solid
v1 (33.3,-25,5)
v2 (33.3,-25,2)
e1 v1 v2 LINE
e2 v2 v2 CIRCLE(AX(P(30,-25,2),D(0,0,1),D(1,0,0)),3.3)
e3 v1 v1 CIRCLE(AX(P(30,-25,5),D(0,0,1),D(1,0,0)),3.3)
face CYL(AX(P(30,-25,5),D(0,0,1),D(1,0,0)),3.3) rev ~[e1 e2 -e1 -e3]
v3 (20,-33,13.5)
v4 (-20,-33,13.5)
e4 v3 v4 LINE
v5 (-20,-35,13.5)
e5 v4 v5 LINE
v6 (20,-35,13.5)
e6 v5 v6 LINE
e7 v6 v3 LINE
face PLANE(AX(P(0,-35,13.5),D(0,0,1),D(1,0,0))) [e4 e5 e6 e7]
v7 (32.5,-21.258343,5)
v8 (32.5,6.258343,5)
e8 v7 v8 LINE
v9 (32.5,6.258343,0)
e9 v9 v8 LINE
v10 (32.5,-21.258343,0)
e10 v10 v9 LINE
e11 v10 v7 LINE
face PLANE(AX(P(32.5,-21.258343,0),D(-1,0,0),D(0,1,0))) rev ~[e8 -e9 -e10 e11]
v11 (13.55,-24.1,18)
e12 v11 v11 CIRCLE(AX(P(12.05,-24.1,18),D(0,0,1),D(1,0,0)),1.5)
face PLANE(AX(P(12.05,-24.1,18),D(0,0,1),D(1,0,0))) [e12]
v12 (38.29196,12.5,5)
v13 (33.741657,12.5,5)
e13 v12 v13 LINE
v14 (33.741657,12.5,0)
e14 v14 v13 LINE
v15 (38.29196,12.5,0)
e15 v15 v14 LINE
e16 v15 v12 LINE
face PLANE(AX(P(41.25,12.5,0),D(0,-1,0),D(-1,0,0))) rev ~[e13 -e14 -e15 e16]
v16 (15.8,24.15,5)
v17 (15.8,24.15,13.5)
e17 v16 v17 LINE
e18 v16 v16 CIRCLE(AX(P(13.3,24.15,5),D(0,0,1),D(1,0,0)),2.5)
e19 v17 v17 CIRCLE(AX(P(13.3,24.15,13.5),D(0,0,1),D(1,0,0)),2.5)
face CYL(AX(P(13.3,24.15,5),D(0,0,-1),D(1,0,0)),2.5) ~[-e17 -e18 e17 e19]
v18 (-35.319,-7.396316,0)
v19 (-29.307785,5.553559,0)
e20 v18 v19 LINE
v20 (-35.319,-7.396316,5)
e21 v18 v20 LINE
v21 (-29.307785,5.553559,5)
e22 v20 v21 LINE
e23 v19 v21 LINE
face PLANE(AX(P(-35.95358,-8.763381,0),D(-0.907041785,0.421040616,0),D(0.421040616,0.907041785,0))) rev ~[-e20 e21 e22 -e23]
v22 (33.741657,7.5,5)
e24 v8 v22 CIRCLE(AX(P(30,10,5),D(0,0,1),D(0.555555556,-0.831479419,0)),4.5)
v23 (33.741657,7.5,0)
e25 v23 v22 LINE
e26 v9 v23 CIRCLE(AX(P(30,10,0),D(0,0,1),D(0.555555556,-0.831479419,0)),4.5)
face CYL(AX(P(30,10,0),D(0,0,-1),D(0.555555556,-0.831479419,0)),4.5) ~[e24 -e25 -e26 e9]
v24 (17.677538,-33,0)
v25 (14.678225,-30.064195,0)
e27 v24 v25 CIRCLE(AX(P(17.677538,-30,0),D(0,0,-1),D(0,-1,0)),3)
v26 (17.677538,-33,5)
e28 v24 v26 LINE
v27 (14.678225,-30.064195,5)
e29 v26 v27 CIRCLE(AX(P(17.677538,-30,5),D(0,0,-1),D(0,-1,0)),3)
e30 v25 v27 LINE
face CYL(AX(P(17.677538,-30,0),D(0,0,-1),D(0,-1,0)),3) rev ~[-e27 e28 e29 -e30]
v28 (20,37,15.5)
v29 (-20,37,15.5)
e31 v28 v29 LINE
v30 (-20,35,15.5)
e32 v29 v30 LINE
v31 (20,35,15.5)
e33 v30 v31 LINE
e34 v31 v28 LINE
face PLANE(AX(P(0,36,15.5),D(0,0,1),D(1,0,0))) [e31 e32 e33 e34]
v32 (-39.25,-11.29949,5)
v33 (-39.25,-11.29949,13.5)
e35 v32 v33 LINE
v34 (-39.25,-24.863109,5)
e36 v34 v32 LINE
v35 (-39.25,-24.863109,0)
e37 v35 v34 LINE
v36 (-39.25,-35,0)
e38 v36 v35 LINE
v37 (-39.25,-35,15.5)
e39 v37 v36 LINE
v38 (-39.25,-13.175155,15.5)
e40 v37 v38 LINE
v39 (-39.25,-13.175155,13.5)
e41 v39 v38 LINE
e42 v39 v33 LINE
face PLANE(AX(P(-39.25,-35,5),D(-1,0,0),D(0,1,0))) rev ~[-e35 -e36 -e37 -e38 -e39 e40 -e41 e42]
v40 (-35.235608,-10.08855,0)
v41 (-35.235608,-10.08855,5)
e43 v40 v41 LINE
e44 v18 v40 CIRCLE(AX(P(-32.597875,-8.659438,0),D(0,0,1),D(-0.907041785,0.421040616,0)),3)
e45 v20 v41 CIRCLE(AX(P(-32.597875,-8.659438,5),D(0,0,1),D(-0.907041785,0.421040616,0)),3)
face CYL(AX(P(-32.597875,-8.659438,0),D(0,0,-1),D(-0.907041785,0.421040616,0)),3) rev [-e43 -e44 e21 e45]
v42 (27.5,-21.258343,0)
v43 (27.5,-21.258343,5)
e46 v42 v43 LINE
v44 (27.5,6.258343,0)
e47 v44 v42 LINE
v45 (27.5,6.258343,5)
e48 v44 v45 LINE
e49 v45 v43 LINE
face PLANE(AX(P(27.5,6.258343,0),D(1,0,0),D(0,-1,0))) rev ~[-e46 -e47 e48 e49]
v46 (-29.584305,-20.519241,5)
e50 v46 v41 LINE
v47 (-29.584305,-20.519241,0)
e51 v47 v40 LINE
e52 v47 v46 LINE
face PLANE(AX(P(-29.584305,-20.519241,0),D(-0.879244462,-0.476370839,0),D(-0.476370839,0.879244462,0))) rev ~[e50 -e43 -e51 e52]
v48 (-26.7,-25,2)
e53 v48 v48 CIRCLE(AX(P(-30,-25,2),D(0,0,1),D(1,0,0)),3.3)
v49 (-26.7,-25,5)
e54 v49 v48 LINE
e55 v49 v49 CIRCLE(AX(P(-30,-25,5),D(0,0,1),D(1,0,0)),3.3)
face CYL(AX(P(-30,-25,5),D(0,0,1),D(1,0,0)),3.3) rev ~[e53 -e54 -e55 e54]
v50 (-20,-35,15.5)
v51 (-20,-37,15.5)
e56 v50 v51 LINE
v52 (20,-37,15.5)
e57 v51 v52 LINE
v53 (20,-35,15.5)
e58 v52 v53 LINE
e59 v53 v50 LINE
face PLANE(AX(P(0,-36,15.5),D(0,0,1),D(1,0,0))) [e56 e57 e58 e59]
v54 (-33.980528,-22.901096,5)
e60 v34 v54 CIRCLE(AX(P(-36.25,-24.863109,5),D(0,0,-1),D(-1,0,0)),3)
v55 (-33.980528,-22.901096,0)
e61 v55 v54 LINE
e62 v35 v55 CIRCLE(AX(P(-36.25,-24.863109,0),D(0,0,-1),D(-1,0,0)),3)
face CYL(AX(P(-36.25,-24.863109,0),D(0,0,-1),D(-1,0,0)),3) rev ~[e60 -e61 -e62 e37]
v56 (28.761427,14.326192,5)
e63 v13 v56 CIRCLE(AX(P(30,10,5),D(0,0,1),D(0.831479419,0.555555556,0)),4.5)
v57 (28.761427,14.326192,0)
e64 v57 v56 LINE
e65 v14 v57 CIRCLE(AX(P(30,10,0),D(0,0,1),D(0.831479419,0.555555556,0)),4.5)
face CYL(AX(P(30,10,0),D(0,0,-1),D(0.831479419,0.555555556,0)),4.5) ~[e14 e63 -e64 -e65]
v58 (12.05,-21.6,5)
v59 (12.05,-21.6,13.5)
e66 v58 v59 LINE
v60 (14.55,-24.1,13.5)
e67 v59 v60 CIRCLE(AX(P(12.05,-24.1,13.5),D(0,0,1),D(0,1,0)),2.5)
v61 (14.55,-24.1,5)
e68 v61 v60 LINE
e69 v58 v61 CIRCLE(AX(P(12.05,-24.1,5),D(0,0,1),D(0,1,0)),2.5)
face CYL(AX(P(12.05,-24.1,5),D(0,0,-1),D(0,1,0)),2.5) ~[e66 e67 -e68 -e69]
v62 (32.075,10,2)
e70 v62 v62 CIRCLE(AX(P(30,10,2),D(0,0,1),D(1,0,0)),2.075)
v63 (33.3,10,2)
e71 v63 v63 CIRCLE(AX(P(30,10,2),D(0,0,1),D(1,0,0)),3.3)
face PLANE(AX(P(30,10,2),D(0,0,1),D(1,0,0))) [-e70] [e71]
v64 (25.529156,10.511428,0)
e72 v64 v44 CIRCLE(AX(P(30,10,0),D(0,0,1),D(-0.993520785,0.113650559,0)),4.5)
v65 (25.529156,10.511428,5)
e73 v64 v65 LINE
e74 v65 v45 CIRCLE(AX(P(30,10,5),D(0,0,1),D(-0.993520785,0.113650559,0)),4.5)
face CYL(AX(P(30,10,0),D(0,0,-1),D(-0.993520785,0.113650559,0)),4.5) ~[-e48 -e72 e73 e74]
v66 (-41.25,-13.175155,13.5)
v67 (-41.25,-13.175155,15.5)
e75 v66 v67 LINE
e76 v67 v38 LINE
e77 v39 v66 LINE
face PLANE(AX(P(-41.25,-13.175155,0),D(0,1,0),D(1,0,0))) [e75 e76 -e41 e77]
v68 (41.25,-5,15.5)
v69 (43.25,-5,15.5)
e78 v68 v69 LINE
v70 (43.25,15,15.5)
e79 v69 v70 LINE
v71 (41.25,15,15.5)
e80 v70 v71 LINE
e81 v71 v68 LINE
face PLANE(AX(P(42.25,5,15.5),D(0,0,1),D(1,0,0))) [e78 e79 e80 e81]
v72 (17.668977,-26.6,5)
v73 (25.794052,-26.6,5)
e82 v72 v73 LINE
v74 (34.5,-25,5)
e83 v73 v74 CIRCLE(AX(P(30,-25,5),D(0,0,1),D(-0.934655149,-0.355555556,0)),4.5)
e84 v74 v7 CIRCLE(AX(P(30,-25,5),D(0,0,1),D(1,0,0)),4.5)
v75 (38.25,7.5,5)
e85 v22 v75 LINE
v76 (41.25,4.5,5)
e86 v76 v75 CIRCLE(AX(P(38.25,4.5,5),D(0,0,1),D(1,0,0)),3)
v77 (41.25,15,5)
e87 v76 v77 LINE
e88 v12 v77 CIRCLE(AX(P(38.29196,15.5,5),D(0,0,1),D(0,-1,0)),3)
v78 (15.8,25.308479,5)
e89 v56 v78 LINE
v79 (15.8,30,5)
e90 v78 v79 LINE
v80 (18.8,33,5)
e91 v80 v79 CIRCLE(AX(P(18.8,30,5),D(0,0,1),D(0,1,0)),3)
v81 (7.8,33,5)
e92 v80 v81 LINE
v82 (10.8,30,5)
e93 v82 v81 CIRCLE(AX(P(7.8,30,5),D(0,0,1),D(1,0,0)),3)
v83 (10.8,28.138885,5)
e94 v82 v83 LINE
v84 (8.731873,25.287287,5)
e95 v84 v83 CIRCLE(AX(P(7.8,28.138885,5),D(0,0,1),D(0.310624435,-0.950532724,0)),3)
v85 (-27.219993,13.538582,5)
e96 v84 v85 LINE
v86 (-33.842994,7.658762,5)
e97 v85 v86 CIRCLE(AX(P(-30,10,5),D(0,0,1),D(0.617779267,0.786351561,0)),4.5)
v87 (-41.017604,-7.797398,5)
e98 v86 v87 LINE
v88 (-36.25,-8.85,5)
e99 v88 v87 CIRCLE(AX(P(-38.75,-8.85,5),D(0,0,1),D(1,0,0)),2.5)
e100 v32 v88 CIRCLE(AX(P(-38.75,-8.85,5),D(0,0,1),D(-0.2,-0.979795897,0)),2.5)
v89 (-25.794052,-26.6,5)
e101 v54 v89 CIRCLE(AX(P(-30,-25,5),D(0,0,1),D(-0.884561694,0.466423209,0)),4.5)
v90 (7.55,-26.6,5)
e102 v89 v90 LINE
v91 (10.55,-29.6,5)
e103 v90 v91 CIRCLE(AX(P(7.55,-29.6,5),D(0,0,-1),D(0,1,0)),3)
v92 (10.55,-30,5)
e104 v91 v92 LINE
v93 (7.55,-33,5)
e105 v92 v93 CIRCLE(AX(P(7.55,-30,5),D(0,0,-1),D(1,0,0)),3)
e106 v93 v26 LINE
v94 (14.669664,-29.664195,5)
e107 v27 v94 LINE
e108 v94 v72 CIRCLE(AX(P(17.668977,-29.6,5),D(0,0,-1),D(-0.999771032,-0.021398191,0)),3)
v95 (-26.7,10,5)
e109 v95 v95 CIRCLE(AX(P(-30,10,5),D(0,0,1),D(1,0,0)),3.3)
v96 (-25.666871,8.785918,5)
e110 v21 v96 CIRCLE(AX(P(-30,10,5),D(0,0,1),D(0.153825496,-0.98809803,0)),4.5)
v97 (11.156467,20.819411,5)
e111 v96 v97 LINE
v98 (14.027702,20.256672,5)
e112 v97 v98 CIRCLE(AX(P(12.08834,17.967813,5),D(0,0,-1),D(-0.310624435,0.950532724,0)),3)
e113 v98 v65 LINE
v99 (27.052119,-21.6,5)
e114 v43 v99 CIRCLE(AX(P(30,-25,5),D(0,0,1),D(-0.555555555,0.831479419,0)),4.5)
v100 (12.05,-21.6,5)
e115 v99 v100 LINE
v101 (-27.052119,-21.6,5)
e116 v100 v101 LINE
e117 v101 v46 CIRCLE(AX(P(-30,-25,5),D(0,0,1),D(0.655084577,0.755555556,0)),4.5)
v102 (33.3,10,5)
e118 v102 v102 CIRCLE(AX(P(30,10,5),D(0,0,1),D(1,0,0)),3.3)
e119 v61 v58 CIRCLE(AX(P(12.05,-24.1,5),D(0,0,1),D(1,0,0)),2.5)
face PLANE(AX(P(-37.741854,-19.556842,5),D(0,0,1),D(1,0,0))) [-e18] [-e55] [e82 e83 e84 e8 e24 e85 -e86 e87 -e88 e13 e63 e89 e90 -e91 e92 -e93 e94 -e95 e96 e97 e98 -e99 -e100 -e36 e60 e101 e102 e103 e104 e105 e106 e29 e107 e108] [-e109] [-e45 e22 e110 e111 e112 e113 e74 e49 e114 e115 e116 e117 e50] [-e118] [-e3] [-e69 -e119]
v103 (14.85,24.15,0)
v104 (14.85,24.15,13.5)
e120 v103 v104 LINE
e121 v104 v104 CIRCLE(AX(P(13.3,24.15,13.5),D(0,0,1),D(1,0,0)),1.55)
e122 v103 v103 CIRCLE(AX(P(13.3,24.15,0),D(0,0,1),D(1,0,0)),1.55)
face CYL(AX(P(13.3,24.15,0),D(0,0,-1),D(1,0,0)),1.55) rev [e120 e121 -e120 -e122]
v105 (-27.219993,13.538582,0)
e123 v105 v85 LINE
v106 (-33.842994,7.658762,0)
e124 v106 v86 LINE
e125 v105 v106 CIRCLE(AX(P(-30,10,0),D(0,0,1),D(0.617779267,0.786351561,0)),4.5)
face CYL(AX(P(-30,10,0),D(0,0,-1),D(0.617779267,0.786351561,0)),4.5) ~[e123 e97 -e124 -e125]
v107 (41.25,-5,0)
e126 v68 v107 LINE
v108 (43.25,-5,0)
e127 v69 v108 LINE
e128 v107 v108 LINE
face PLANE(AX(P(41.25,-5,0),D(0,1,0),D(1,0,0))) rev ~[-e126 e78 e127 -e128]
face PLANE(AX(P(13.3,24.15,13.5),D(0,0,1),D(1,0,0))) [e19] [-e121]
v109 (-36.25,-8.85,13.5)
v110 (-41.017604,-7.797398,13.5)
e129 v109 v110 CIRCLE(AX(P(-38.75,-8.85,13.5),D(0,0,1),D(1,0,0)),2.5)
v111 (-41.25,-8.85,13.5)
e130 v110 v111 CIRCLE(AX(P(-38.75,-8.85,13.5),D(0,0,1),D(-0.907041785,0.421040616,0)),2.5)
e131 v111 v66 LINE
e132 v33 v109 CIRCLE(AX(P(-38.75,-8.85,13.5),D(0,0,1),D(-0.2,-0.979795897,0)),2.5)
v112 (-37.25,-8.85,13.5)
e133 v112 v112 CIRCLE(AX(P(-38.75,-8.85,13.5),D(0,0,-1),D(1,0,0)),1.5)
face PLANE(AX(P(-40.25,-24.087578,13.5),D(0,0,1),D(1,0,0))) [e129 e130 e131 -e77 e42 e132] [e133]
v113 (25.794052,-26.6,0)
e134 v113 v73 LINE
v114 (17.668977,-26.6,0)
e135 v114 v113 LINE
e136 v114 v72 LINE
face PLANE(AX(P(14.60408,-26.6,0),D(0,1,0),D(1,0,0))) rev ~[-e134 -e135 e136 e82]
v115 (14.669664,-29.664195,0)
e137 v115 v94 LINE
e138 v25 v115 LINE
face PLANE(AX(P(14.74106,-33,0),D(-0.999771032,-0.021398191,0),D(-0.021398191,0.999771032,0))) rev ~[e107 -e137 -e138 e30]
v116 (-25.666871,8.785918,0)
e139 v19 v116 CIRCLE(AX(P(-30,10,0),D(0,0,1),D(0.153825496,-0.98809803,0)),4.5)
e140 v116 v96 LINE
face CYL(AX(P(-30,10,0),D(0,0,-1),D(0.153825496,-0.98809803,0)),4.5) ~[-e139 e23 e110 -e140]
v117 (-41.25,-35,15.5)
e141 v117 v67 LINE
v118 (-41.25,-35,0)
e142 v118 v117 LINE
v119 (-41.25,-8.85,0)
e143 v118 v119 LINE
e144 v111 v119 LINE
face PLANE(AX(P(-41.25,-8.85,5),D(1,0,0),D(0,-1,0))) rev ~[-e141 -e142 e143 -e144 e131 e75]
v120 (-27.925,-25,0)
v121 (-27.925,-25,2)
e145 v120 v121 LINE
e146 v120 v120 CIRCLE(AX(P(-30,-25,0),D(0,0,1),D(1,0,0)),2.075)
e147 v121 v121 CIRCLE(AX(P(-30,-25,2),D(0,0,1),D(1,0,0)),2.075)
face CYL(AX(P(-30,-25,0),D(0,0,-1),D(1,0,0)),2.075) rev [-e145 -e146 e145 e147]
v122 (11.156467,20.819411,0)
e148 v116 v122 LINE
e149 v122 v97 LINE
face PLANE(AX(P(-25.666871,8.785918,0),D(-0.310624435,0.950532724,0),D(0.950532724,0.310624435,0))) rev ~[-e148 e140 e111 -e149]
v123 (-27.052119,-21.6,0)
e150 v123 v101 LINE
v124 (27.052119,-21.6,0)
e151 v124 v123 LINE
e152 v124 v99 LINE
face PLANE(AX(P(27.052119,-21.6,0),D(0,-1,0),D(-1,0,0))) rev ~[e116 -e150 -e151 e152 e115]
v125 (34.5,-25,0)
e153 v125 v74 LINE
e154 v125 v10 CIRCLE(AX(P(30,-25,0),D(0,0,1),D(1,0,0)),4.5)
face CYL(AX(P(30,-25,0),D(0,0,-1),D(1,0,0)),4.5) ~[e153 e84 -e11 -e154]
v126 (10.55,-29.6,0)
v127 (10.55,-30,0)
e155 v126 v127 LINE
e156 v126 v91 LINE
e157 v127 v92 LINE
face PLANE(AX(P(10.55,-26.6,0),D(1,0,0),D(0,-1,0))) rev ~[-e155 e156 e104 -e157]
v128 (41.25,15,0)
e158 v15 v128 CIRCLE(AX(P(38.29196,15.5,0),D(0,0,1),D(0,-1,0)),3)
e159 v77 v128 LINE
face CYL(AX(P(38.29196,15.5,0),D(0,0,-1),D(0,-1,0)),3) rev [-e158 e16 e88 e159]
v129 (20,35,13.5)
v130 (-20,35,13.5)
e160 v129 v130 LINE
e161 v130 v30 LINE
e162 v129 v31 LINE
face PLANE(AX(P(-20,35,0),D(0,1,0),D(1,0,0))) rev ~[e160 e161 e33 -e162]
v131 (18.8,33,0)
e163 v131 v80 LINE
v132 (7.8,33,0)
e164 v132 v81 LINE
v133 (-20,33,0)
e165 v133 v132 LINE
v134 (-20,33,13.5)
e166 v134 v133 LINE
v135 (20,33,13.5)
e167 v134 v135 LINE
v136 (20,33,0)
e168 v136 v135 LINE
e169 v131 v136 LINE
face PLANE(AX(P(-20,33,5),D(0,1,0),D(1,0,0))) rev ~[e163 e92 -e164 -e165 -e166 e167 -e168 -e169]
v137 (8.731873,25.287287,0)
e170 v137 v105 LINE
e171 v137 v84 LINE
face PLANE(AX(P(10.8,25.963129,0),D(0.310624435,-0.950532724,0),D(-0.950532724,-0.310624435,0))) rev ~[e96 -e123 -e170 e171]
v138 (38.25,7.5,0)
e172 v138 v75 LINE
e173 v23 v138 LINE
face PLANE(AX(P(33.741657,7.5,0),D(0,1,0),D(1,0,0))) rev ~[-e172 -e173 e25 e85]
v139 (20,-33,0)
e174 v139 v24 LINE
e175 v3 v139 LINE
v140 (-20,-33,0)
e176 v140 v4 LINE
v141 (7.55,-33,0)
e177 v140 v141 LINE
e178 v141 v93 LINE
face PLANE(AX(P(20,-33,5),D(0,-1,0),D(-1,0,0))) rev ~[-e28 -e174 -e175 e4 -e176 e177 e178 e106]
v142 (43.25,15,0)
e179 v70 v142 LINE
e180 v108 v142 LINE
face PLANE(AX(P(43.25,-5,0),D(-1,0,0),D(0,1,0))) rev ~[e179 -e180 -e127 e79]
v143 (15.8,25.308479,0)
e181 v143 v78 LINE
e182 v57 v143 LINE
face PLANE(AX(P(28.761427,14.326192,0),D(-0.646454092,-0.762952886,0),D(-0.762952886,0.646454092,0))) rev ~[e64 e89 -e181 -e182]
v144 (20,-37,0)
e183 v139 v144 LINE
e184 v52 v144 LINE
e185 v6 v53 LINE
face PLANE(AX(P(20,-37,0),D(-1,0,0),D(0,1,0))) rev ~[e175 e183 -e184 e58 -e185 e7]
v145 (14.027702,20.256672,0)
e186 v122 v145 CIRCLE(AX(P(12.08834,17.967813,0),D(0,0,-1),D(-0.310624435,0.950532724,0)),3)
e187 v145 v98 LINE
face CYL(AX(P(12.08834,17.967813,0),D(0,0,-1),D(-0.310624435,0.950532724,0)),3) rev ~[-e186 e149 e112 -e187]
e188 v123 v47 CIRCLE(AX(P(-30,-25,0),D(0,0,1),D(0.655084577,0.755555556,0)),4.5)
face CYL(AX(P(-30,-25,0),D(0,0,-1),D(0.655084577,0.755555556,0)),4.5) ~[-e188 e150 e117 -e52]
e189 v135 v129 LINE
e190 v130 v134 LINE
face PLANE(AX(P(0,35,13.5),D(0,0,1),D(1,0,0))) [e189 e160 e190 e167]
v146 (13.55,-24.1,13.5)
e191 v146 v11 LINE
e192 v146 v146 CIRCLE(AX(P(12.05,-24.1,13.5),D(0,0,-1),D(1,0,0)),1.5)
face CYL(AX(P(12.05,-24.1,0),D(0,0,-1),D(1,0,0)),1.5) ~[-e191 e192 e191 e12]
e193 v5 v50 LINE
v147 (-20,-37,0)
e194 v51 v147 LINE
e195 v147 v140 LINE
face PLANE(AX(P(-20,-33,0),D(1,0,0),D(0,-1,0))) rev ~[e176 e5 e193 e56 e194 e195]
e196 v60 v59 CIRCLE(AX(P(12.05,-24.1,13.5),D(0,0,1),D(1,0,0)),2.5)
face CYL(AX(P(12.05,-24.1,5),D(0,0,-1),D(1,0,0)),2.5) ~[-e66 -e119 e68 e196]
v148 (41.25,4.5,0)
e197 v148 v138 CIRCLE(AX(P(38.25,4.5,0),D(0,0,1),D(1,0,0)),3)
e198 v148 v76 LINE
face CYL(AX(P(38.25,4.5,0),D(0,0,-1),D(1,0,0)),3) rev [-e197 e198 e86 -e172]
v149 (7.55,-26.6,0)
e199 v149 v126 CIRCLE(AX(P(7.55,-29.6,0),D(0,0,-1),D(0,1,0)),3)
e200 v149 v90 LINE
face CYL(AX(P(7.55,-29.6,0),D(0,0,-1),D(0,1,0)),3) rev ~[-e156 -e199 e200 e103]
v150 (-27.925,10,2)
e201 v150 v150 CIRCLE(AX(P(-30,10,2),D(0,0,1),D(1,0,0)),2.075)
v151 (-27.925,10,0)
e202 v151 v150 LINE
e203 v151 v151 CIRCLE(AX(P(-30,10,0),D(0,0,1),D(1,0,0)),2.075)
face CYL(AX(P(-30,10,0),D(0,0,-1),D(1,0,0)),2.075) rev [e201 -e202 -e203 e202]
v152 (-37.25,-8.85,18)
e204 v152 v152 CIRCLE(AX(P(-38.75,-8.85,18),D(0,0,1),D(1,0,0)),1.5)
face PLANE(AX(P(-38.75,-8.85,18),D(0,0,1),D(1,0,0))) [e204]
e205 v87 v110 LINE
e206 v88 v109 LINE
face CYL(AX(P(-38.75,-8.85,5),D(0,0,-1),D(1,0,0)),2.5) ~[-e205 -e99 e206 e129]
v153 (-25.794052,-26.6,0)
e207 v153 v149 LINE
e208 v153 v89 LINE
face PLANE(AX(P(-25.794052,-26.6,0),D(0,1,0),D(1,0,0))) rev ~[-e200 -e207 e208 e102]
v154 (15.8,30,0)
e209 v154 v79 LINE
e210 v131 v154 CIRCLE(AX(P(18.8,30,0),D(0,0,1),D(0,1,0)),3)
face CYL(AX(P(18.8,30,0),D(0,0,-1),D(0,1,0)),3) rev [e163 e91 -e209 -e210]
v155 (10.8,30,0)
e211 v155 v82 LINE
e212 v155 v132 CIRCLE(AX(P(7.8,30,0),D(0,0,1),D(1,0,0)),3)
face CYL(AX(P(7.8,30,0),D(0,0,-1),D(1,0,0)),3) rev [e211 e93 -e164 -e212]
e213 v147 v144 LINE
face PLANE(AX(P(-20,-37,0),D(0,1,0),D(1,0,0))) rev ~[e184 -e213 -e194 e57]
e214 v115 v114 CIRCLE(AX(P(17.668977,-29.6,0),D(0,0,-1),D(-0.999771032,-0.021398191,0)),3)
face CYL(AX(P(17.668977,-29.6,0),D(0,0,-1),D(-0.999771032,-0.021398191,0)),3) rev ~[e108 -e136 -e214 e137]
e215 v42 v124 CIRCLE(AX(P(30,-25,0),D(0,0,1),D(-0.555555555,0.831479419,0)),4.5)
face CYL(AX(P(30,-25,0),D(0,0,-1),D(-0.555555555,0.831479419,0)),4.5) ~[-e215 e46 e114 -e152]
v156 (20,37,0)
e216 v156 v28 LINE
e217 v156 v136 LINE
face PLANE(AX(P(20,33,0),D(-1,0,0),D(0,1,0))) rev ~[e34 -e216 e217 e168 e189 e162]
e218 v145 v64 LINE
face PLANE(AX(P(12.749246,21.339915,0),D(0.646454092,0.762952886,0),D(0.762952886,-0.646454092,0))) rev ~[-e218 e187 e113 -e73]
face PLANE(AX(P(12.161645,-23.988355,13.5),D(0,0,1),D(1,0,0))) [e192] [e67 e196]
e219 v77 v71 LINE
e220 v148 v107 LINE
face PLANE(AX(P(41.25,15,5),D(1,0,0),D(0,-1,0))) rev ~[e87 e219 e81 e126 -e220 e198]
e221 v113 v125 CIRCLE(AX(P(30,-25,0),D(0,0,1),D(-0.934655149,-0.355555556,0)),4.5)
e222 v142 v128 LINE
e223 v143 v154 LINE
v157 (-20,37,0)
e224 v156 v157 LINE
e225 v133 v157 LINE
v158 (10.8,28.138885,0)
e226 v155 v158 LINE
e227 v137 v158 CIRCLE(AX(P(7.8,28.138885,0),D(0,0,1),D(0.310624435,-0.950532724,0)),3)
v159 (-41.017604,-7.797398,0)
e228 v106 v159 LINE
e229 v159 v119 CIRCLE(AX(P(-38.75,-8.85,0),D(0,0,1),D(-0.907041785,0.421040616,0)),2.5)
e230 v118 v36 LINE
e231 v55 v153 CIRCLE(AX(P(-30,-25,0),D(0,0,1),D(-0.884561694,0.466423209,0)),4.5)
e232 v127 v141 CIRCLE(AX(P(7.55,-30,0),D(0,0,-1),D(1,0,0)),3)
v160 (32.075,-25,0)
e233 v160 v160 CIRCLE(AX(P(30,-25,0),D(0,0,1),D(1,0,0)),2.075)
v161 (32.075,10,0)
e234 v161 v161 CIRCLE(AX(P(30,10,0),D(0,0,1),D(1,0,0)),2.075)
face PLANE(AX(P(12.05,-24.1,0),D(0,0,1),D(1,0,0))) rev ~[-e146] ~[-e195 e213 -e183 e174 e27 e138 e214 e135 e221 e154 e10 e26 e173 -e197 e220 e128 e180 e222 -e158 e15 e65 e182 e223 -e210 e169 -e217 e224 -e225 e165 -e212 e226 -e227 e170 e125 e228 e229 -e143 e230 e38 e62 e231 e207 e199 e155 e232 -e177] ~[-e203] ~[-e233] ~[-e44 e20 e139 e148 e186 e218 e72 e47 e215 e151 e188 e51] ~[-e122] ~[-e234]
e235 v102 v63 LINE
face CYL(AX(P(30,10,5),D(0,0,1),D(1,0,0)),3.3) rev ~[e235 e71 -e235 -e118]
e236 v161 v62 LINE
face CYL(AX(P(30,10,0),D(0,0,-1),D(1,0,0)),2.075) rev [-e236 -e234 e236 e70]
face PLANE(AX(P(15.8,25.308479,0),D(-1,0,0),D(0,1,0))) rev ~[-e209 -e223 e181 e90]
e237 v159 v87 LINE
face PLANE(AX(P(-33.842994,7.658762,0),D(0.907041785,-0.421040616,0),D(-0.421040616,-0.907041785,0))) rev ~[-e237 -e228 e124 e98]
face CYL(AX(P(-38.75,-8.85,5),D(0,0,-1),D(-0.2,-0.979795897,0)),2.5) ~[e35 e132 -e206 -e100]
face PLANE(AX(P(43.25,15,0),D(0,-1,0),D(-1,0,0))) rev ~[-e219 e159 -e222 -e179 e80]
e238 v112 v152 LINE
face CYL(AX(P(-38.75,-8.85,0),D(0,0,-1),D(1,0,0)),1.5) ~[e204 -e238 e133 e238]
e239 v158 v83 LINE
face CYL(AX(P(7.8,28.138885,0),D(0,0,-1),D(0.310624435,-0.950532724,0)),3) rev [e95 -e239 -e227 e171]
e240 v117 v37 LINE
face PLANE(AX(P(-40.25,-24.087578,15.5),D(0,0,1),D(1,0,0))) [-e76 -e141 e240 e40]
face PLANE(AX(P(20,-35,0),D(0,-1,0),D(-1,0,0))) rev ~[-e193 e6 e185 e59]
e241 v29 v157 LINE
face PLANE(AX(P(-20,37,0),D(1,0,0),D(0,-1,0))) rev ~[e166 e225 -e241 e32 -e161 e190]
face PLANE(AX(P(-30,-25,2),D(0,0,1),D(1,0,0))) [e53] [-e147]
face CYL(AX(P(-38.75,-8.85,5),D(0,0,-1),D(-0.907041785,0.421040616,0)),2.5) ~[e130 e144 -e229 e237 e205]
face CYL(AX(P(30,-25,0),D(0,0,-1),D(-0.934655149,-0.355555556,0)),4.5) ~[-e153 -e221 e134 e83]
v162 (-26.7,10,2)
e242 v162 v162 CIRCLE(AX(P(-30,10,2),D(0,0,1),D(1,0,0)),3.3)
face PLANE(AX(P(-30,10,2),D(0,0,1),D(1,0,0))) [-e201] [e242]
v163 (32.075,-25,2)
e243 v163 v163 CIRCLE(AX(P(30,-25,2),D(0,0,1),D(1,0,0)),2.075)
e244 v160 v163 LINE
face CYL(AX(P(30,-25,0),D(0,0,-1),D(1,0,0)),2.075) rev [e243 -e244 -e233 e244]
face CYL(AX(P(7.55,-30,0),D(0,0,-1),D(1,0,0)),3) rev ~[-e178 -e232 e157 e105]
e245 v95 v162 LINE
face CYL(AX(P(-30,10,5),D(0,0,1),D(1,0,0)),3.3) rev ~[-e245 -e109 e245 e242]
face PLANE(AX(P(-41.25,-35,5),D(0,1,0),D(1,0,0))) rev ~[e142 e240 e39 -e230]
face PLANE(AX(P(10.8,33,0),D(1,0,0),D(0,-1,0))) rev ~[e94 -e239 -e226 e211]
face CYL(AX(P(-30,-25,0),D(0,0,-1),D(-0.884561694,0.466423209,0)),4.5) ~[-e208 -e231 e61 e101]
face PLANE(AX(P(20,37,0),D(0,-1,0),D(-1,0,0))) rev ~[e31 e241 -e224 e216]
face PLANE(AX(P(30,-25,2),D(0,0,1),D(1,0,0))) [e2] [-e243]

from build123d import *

# Parameters (mm, degrees)
F0_R        = 2.075
F0_R_2      = 1.5
F0_W        = 2
F0_H        = 21.8248448855
F0_R_3      = 1.55
F0_W_2      = 30.8
F0_H_2      = 2
F0_W_3      = 4.2
F0_W_4      = 5
F0_W_5      = 30.55
F1_DEPTH    = 5
F2_W        = 2
F2_H        = 21.8248448855
F2_R        = 2.5
F3_DEPTH    = 8.5
F4_DEPTH    = 11
F5_DEPTH    = 13.5
F6_T1_DEPTH = 5
F7_R        = 3.3
F7_R_2      = 2.075
F8_DEPTH    = 3
F9_DEPTH    = 18
F10_DEPTH   = 15.5


# Not quite as in the source:
# - a fillet or chamfer that OpenCascade refuses, or shapes differently, is made with other operations: its cross-section is extruded or revolved along the edge and cut away or added


with BuildPart() as f1:
    # F0 (on Top) → F1 (new body)
    with BuildSketch(Plane.XY):
        with BuildLine():
            Line((10.8, 24.15), (10.8, 25.9631294877))
            Line((10.8, 25.9631294877), (-27.2199932987, 13.538582024))
            ThreePointArc((-27.2199932987, 13.538582024), (-25.9527768683, 11.967227725), (-25.5, 10))
            ThreePointArc((-25.5, 10), (-25.5419129691, 9.387252071), (-25.666871122, 8.785918402))
            Line((-25.666871122, 8.785918402), (12.7492455063, 21.3399149445))
            Line((12.7492455063, 21.3399149445), (11.6838647694, 22.2426177844))
            ThreePointArc((11.6838647694, 22.2426177844), (11.0317034942, 23.0988906043), (10.8, 24.15))
        make_face()
        with BuildLine():
            ThreePointArc((-27.2199932987, 13.538582024), (-32.9875670099, 13.3651810295), (-33.8429941942, 7.6587619464))
            ThreePointArc((-33.8429941942, 7.6587619464), (-31.8946827733, 5.9183119683), (-29.30778527, 5.5535588649))
            ThreePointArc((-29.30778527, 5.5535588649), (-27.0124329901, 6.6348189705), (-25.666871122, 8.785918402))
            ThreePointArc((-25.666871122, 8.785918402), (-25.5419129691, 9.387252071), (-25.5, 10))
            ThreePointArc((-25.5, 10), (-25.9527768683, 11.967227725), (-27.2199932987, 13.538582024))
        make_face()
        with Locations((-30, 10)):
            Circle(F0_R, mode=Mode.SUBTRACT)
        with BuildLine():
            Line((-33.8429941942, 7.6587619464), (-41.0176044621, -7.7973984593))
            ThreePointArc((-41.0176044621, -7.7973984593), (-38.8274003861, -6.3511984512), (-36.5518888448, -7.6590729035))
            Line((-36.5518888448, -7.6590729035), (-35.9535795759, -8.7633808683))
            Line((-35.9535795759, -8.7633808683), (-29.30778527, 5.5535588649))
            ThreePointArc((-29.30778527, 5.5535588649), (-31.8946827733, 5.9183119683), (-33.8429941942, 7.6587619464))
        make_face()
        with BuildLine():
            ThreePointArc((-41.0176044621, -7.7973984593), (-41.1912098594, -8.3110246551), (-41.25, -8.85))
            ThreePointArc((-41.25, -8.85), (-41.1733528311, -9.4642972049), (-40.9481111552, -10.0409270965))
            ThreePointArc((-40.9481111552, -10.0409270965), (-38.6725996139, -11.3488015488), (-36.4823955379, -9.9026015407))
            ThreePointArc((-36.4823955379, -9.9026015407), (-36.3087901406, -9.3889753449), (-36.25, -8.85))
            ThreePointArc((-36.25, -8.85), (-36.3266471689, -8.2357027951), (-36.5518888448, -7.6590729035))
            ThreePointArc((-36.5518888448, -7.6590729035), (-38.8274003861, -6.3511984512), (-41.0176044621, -7.7973984593))
        make_face()
        with Locations((-38.75, -8.85)):
            Circle(F0_R_2, mode=Mode.SUBTRACT)
        with BuildLine():
            ThreePointArc((-40.9481111552, -10.0409270965), (-41.1733528311, -9.4642972049), (-41.25, -8.85))
            Line((-41.25, -8.85), (-41.25, -13.1751551145))
            Line((-41.25, -13.1751551145), (-39.25, -13.1751551145))
            Line((-39.25, -13.1751551145), (-40.9481111552, -10.0409270965))
        make_face()
        with BuildLine():
            Line((-35.9535795759, -8.7633808683), (-36.5518888448, -7.6590729035))
            ThreePointArc((-36.5518888448, -7.6590729035), (-36.3266471689, -8.2357027951), (-36.25, -8.85))
            ThreePointArc((-36.25, -8.85), (-36.3087901406, -9.3889753449), (-36.4823955379, -9.9026015407))
            Line((-36.4823955379, -9.9026015407), (-35.9535795759, -8.7633808683))
        make_face()
        with BuildLine():
            ThreePointArc((-36.4823955379, -9.9026015407), (-38.6725996139, -11.3488015488), (-40.9481111552, -10.0409270965))
            Line((-40.9481111552, -10.0409270965), (-39.25, -13.1751551145))
            Line((-39.25, -13.1751551145), (-33.9805276223, -22.9010955601))
            ThreePointArc((-33.9805276223, -22.9010955601), (-32.1436687737, -21.0433999206), (-29.5843053118, -20.5192413671))
            Line((-29.5843053118, -20.5192413671), (-35.9535795759, -8.7633808683))
            Line((-35.9535795759, -8.7633808683), (-36.4823955379, -9.9026015407))
        make_face()
        with Locations((-40.25, -24.0875775572)):
            Rectangle(F0_W, F0_H)
        with BuildLine():
            ThreePointArc((-29.5843053118, -20.5192413671), (-32.1436687737, -21.0433999206), (-33.9805276223, -22.9010955601))
            ThreePointArc((-33.9805276223, -22.9010955601), (-31.8528834609, -29.1008319742), (-25.794051831, -26.6))
            ThreePointArc((-25.794051831, -26.6), (-25.5741234337, -25.8133981927), (-25.5, -25))
            ThreePointArc((-25.5, -25), (-25.9063791898, -23.1312387359), (-27.0521194054, -21.6))
            ThreePointArc((-27.0521194054, -21.6), (-28.2335290899, -20.8612102586), (-29.5843053118, -20.5192413671))
        make_face()
        with Locations((-30, -25)):
            Circle(F0_R, mode=Mode.SUBTRACT)
        with BuildLine():
            ThreePointArc((-25.5, -25), (-25.5741234337, -25.8133981927), (-25.794051831, -26.6))
            Line((-25.794051831, -26.6), (10.55, -26.6))
            Line((10.55, -26.6), (10.55, -26.1))
            ThreePointArc((10.55, -26.1), (9.6782917549, -23.309430585), (12.05, -21.6))
            Line((12.05, -21.6), (-27.0521194054, -21.6))
            ThreePointArc((-27.0521194054, -21.6), (-25.9063791898, -23.1312387359), (-25.5, -25))
        make_face()
        with BuildLine():
            Line((10.55, -26.1), (10.55, -26.6))
            Line((10.55, -26.6), (12.05, -26.6))
            ThreePointArc((12.05, -26.6), (11.259430585, -26.4717082451), (10.55, -26.1))
        make_face()
        with BuildLine():
            ThreePointArc((14.5494275812, -24.0465045226), (13.7987511696, -22.3134196501), (12.05, -21.6))
            ThreePointArc((12.05, -21.6), (9.6782917549, -23.309430585), (10.55, -26.1))
            ThreePointArc((10.55, -26.1), (11.259430585, -26.4717082451), (12.05, -26.6))
            ThreePointArc((12.05, -26.6), (13.817766953, -25.867766953), (14.55, -24.1))
            ThreePointArc((14.55, -24.1), (14.5498568912, -24.0732507301), (14.5494275812, -24.0465045226))
        make_face()
        with Locations((12.05, -24.1)):
            Circle(F0_R_2, mode=Mode.SUBTRACT)
        with Locations((12.05, -24.1)):
            Circle(F0_R_2)
        Polygon((12.05, -26.6), (10.55, -26.6), (10.55, -33), (14.7410600647, -33), (14.6040802787, -26.6), align=None)
        with BuildLine():
            ThreePointArc((14.55, -24.1), (13.817766953, -25.867766953), (12.05, -26.6))
            Line((12.05, -26.6), (14.6040802787, -26.6))
            Line((14.6040802787, -26.6), (14.5494275812, -24.0465045226))
            ThreePointArc((14.5494275812, -24.0465045226), (14.5498568912, -24.0732507301), (14.55, -24.1))
        make_face()
        with BuildLine():
            Line((27.0521194054, -21.6), (12.05, -21.6))
            ThreePointArc((12.05, -21.6), (13.7987511696, -22.3134196501), (14.5494275812, -24.0465045226))
            Line((14.5494275812, -24.0465045226), (14.6040802787, -26.6))
            Line((14.6040802787, -26.6), (25.794051831, -26.6))
            ThreePointArc((25.794051831, -26.6), (25.6360205667, -23.9019637959), (27.0521194054, -21.6))
        make_face()
        Polygon((10.55, -35), (-20, -35), (-20, -37), (20, -37), (20, -35), (14.7838662478, -35), align=None)
        with BuildLine():
            ThreePointArc((27.5, -21.2583426132), (27.2707082996, -21.4221561221), (27.0521194054, -21.6))
            ThreePointArc((27.0521194054, -21.6), (25.6360205667, -23.9019637959), (25.794051831, -26.6))
            ThreePointArc((25.794051831, -26.6), (30.8133981927, -29.4258765663), (34.5, -25))
            ThreePointArc((34.5, -25), (33.9686269666, -22.8786796564), (32.5, -21.2583426132))
            ThreePointArc((32.5, -21.2583426132), (30, -20.5), (27.5, -21.2583426132))
        make_face()
        with Locations((30, -25)):
            Circle(F0_R, mode=Mode.SUBTRACT)
        with BuildLine():
            ThreePointArc((32.5, 6.2583426132), (30, 5.5), (27.5, 6.2583426132))
            Line((27.5, 6.2583426132), (27.5, -21.2583426132))
            ThreePointArc((27.5, -21.2583426132), (30, -20.5), (32.5, -21.2583426132))
            Line((32.5, -21.2583426132), (32.5, 6.2583426132))
        make_face()
        with BuildLine():
            ThreePointArc((33.7416573868, 12.5), (31.5492262671, 14.2249139605), (28.761426928, 14.326191945))
            ThreePointArc((28.761426928, 14.326191945), (26.5667120119, 12.9090434151), (25.5291564668, 10.5114275138))
            ThreePointArc((25.5291564668, 10.5114275138), (25.9170662896, 8.1080030877), (27.5, 6.2583426132))
            ThreePointArc((27.5, 6.2583426132), (30, 5.5), (32.5, 6.2583426132))
            ThreePointArc((32.5, 6.2583426132), (33.1819805153, 6.8180194847), (33.7416573868, 7.5))
            ThreePointArc((33.7416573868, 7.5), (34.3062430401, 8.6937569599), (34.5, 10))
            ThreePointArc((34.5, 10), (34.3062430401, 11.3062430401), (33.7416573868, 12.5))
        make_face()
        with Locations((30, 10)):
            Circle(F0_R, mode=Mode.SUBTRACT)
        with BuildLine():
            Line((41.25, 7.5), (41.25, 12.5))
            Line((41.25, 12.5), (33.7416573868, 12.5))
            ThreePointArc((33.7416573868, 12.5), (34.3062430401, 11.3062430401), (34.5, 10))
            ThreePointArc((34.5, 10), (34.3062430401, 8.6937569599), (33.7416573868, 7.5))
            Line((33.7416573868, 7.5), (41.25, 7.5))
        make_face()
        Polygon((43.25, 15), (41.25, 15), (41.25, 12.5), (41.25, 7.5), (41.25, -5), (43.25, -5), align=None)
        with BuildLine():
            ThreePointArc((14.0765610884, 21.773668189), (12.8191677883, 21.6966756464), (11.6838647694, 22.2426177844))
            Line((11.6838647694, 22.2426177844), (12.7492455063, 21.3399149445))
            Line((12.7492455063, 21.3399149445), (14.0765610884, 21.773668189))
        make_face()
        with BuildLine():
            ThreePointArc((14.9161352306, 26.0573822156), (13.7808322117, 26.6033243536), (12.5234389116, 26.526331811))
            ThreePointArc((12.5234389116, 26.526331811), (11.2762160786, 25.6177529218), (10.8, 24.15))
            ThreePointArc((10.8, 24.15), (11.0317034942, 23.0988906043), (11.6838647694, 22.2426177844))
            ThreePointArc((11.6838647694, 22.2426177844), (12.8191677883, 21.6966756464), (14.0765610884, 21.773668189))
            ThreePointArc((14.0765610884, 21.773668189), (15.3237839214, 22.6822470782), (15.8, 24.15))
            ThreePointArc((15.8, 24.15), (15.5682965058, 25.2011093957), (14.9161352306, 26.0573822156))
        make_face()
        with Locations((13.3, 24.15)):
            Circle(F0_R_3, mode=Mode.SUBTRACT)
        with Locations((13.3, 24.15)):
            Circle(F0_R_3)
        with BuildLine():
            Line((28.761426928, 14.326191945), (15.8, 25.3084788332))
            Line((15.8, 25.3084788332), (15.8, 24.15))
            ThreePointArc((15.8, 24.15), (15.3237839214, 22.6822470782), (14.0765610884, 21.773668189))
            Line((14.0765610884, 21.773668189), (12.7492455063, 21.3399149445))
            Line((12.7492455063, 21.3399149445), (25.5291564668, 10.5114275138))
            ThreePointArc((25.5291564668, 10.5114275138), (26.5667120119, 12.9090434151), (28.761426928, 14.326191945))
        make_face()
        with BuildLine():
            Line((12.5234389116, 26.526331811), (10.8, 25.9631294877))
            Line((10.8, 25.9631294877), (10.8, 24.15))
            ThreePointArc((10.8, 24.15), (11.2762160786, 25.6177529218), (12.5234389116, 26.526331811))
        make_face()
        with BuildLine():
            Line((15.8, 24.15), (15.8, 25.3084788332))
            Line((15.8, 25.3084788332), (14.9161352306, 26.0573822156))
            ThreePointArc((14.9161352306, 26.0573822156), (15.5682965058, 25.2011093957), (15.8, 24.15))
        make_face()
        with BuildLine():
            Line((15.8, 33), (10.8, 33))
            Line((10.8, 33), (10.8, 25.9631294877))
            Line((10.8, 25.9631294877), (12.5234389116, 26.526331811))
            ThreePointArc((12.5234389116, 26.526331811), (13.7808322117, 26.6033243536), (14.9161352306, 26.0573822156))
            Line((14.9161352306, 26.0573822156), (15.8, 25.3084788332))
            Line((15.8, 25.3084788332), (15.8, 33))
        make_face()
        Polygon((-20, 37), (-20, 35), (10.8, 35), (15.8, 35), (20, 35), (20, 37), align=None)
        with Locations((-38.75, -8.85)):
            Circle(F0_R_2)
        with Locations((-4.6, 34)):
            Rectangle(F0_W_2, F0_H_2)
        with Locations((17.9, 34)):
            Rectangle(F0_W_3, F0_H_2)
        with Locations((13.3, 34)):
            Rectangle(F0_W_4, F0_H_2)
        Polygon((10.55, -33), (10.55, -35), (14.7838662478, -35), (14.7410600647, -33), align=None)
        Polygon((14.7410600647, -33), (14.7838662478, -35), (20, -35), (20, -33), align=None)
        with Locations((-4.725, -34)):
            Rectangle(F0_W_5, F0_H_2)
    extrude(amount=F1_DEPTH)

    # F2 (on face) → F3 (join)
    with BuildSketch(Plane.XY.offset(5)):
        with Locations((-40.25, -24.0875775572)):
            Rectangle(F2_W, F2_H)
        with BuildLine():
            ThreePointArc((-39.25, -11.2994897428), (-37.1688611699, -10.7864916731), (-36.25, -8.85))
            ThreePointArc((-36.25, -8.85), (-38.2110246551, -6.4087901406), (-41.0176044621, -7.7973984593))
            ThreePointArc((-41.0176044621, -7.7973984593), (-41.1912098594, -8.3110246551), (-41.25, -8.85))
            ThreePointArc((-41.25, -8.85), (-40.6864916731, -10.4311388301), (-39.25, -11.2994897428))
        make_face()
        with Locations((13.3, 24.15)):
            Circle(F2_R)
        Polygon((-20, 33), (10.8, 33), (15.8, 33), (20, 33), (20, 37), (-20, 37), (-20, 35), align=None)
        Polygon((41.25, 15), (41.25, 12.5), (41.25, 7.5), (41.25, -5), (43.25, -5), (43.25, 15), align=None)
        Polygon((14.7410600647, -33), (10.55, -33), (-20, -33), (-20, -37), (20, -37), (20, -33), align=None)
        with BuildLine():
            Line((-39.25, -13.1751551145), (-39.25, -11.2994897428))
            ThreePointArc((-39.25, -11.2994897428), (-40.6864916731, -10.4311388301), (-41.25, -8.85))
            Line((-41.25, -8.85), (-41.25, -13.1751551145))
            Line((-41.25, -13.1751551145), (-39.25, -13.1751551145))
        make_face()
        with BuildLine():
            ThreePointArc((12.05, -21.6), (10.282233047, -25.867766953), (14.55, -24.1))
            ThreePointArc((14.55, -24.1), (13.817766953, -22.332233047), (12.05, -21.6))
        make_face()
    extrude(amount=F3_DEPTH)

    # F0 (on Top) → F4 (join)
    with BuildSketch(Plane.XY):
        with Locations((-40.25, -24.0875775572)):
            Rectangle(F0_W, F0_H)
        Polygon((10.55, -35), (-20, -35), (-20, -37), (20, -37), (20, -35), (14.7838662478, -35), align=None)
        Polygon((-20, 37), (-20, 35), (10.8, 35), (15.8, 35), (20, 35), (20, 37), align=None)
        Polygon((43.25, 15), (41.25, 15), (41.25, 12.5), (41.25, 7.5), (41.25, -5), (43.25, -5), align=None)
        with Locations((-38.75, -8.85)):
            Circle(F0_R_2)
        with Locations((12.05, -24.1)):
            Circle(F0_R_2)
    extrude(amount=F4_DEPTH)

    # F0 (on Top) → F5 (cut, through all)
    with BuildSketch(Plane.XY):
        with Locations((13.3, 24.15)):
            Circle(F0_R_3)
    extrude(amount=F5_DEPTH, mode=Mode.SUBTRACT)

    # F6: fillet of radius 3 on 12 edges, made by hand

    # F6_s2 → F6_t1 (join)
    with BuildSketch(Plane.XY):
        with BuildLine():
            ThreePointArc((-39.25, -24.8631085894), (-37.2968005701, -22.0516661542), (-33.9805276223, -22.9010955601))
            Line((-33.9805276223, -22.9010955601), (-39.25, -13.1751551145))
            Line((-39.25, -13.1751551145), (-39.25, -24.8631085894))
        make_face()
        with BuildLine():
            ThreePointArc((18.8, 33), (16.6786796564, 32.1213203436), (15.8, 30))
            Line((15.8, 30), (15.8, 33))
            Line((15.8, 33), (18.8, 33))
        make_face()
        with BuildLine():
            ThreePointArc((38.2919601084, 12.5), (40.2284517816, 13.2087121525), (41.25, 15))
            Line((41.25, 15), (41.25, 12.5))
            Line((41.25, 12.5), (38.2919601084, 12.5))
        make_face()
        with BuildLine():
            ThreePointArc((41.25, 4.5), (40.3713203436, 6.6213203436), (38.25, 7.5))
            Line((38.25, 7.5), (41.25, 7.5))
            Line((41.25, 7.5), (41.25, 4.5))
        make_face()
        with BuildLine():
            ThreePointArc((17.6775378499, -33), (15.5790364463, -32.1438964199), (14.6782247524, -30.0641945728))
            Line((14.6782247524, -30.0641945728), (14.7410600647, -33))
            Line((14.7410600647, -33), (17.6775378499, -33))
        make_face()
        with BuildLine():
            ThreePointArc((14.6696635157, -29.6641945728), (15.5250801933, -27.5014985964), (17.6689766132, -26.6))
            Line((17.6689766132, -26.6), (14.6040802787, -26.6))
            Line((14.6040802787, -26.6), (14.6696635157, -29.6641945728))
        make_face()
        with BuildLine():
            ThreePointArc((11.1564668077, 20.8194110511), (12.6653387678, 20.9118021022), (14.0277023905, 20.2566715366))
            Line((14.0277023905, 20.2566715366), (12.7492455063, 21.3399149445))
            Line((12.7492455063, 21.3399149445), (11.1564668077, 20.8194110511))
        make_face()
        with BuildLine():
            ThreePointArc((-35.3190004215, -7.3963160613), (-35.5964369255, -8.7523183735), (-35.2356084533, -10.088550426))
            Line((-35.2356084533, -10.088550426), (-35.9535795759, -8.7633808683))
            Line((-35.9535795759, -8.7633808683), (-35.3190004215, -7.3963160613))
        make_face()
        with BuildLine():
            ThreePointArc((7.55, -26.6), (9.6713203436, -27.4786796564), (10.55, -29.6))
            Line((10.55, -29.6), (10.55, -26.6))
            Line((10.55, -26.6), (7.55, -26.6))
        make_face()
        with BuildLine():
            ThreePointArc((10.55, -30), (9.6713203436, -32.1213203436), (7.55, -33))
            Line((7.55, -33), (10.55, -33))
            Line((10.55, -33), (10.55, -30))
        make_face()
        with BuildLine():
            ThreePointArc((10.8, 30), (9.9213203436, 32.1213203436), (7.8, 33))
            Line((7.8, 33), (10.8, 33))
            Line((10.8, 33), (10.8, 30))
        make_face()
        with BuildLine():
            ThreePointArc((8.731873306, 25.2872866997), (10.2285407057, 26.3775813667), (10.8, 28.1388848729))
            Line((10.8, 28.1388848729), (10.8, 25.9631294877))
            Line((10.8, 25.9631294877), (8.731873306, 25.2872866997))
        make_face()
    extrude(amount=F6_T1_DEPTH)

    # F7 (on face) → F8 (cut)
    with BuildSketch(Plane.XY.offset(5)):
        with Locations((-30, 10)):
            Circle(F7_R)
        with Locations((-30, 10)):
            Circle(F7_R_2, mode=Mode.SUBTRACT)
        with Locations((30, 10)):
            Circle(F7_R)
        with Locations((30, 10)):
            Circle(F7_R_2, mode=Mode.SUBTRACT)
        with Locations((-30, -25)):
            Circle(F7_R)
        with Locations((-30, -25)):
            Circle(F7_R_2, mode=Mode.SUBTRACT)
        with Locations((30, -25)):
            Circle(F7_R)
        with Locations((30, -25)):
            Circle(F7_R_2, mode=Mode.SUBTRACT)
    extrude(amount=-F8_DEPTH, mode=Mode.SUBTRACT)

    # F0 (on Top) → F9 (join)
    with BuildSketch(Plane.XY):
        with Locations((12.05, -24.1)):
            Circle(F0_R_2)
        with Locations((-38.75, -8.85)):
            Circle(F0_R_2)
    extrude(amount=F9_DEPTH)

    # F0 (on Top) → F10 (join)
    with BuildSketch(Plane.XY):
        Polygon((10.55, -35), (-20, -35), (-20, -37), (20, -37), (20, -35), (14.7838662478, -35), align=None)
        with Locations((-40.25, -24.0875775572)):
            Rectangle(F0_W, F0_H)
        Polygon((43.25, 15), (41.25, 15), (41.25, 12.5), (41.25, 7.5), (41.25, -5), (43.25, -5), align=None)
        Polygon((-20, 37), (-20, 35), (10.8, 35), (15.8, 35), (20, 35), (20, 37), align=None)
    extrude(amount=F10_DEPTH)


solid = f1.part
